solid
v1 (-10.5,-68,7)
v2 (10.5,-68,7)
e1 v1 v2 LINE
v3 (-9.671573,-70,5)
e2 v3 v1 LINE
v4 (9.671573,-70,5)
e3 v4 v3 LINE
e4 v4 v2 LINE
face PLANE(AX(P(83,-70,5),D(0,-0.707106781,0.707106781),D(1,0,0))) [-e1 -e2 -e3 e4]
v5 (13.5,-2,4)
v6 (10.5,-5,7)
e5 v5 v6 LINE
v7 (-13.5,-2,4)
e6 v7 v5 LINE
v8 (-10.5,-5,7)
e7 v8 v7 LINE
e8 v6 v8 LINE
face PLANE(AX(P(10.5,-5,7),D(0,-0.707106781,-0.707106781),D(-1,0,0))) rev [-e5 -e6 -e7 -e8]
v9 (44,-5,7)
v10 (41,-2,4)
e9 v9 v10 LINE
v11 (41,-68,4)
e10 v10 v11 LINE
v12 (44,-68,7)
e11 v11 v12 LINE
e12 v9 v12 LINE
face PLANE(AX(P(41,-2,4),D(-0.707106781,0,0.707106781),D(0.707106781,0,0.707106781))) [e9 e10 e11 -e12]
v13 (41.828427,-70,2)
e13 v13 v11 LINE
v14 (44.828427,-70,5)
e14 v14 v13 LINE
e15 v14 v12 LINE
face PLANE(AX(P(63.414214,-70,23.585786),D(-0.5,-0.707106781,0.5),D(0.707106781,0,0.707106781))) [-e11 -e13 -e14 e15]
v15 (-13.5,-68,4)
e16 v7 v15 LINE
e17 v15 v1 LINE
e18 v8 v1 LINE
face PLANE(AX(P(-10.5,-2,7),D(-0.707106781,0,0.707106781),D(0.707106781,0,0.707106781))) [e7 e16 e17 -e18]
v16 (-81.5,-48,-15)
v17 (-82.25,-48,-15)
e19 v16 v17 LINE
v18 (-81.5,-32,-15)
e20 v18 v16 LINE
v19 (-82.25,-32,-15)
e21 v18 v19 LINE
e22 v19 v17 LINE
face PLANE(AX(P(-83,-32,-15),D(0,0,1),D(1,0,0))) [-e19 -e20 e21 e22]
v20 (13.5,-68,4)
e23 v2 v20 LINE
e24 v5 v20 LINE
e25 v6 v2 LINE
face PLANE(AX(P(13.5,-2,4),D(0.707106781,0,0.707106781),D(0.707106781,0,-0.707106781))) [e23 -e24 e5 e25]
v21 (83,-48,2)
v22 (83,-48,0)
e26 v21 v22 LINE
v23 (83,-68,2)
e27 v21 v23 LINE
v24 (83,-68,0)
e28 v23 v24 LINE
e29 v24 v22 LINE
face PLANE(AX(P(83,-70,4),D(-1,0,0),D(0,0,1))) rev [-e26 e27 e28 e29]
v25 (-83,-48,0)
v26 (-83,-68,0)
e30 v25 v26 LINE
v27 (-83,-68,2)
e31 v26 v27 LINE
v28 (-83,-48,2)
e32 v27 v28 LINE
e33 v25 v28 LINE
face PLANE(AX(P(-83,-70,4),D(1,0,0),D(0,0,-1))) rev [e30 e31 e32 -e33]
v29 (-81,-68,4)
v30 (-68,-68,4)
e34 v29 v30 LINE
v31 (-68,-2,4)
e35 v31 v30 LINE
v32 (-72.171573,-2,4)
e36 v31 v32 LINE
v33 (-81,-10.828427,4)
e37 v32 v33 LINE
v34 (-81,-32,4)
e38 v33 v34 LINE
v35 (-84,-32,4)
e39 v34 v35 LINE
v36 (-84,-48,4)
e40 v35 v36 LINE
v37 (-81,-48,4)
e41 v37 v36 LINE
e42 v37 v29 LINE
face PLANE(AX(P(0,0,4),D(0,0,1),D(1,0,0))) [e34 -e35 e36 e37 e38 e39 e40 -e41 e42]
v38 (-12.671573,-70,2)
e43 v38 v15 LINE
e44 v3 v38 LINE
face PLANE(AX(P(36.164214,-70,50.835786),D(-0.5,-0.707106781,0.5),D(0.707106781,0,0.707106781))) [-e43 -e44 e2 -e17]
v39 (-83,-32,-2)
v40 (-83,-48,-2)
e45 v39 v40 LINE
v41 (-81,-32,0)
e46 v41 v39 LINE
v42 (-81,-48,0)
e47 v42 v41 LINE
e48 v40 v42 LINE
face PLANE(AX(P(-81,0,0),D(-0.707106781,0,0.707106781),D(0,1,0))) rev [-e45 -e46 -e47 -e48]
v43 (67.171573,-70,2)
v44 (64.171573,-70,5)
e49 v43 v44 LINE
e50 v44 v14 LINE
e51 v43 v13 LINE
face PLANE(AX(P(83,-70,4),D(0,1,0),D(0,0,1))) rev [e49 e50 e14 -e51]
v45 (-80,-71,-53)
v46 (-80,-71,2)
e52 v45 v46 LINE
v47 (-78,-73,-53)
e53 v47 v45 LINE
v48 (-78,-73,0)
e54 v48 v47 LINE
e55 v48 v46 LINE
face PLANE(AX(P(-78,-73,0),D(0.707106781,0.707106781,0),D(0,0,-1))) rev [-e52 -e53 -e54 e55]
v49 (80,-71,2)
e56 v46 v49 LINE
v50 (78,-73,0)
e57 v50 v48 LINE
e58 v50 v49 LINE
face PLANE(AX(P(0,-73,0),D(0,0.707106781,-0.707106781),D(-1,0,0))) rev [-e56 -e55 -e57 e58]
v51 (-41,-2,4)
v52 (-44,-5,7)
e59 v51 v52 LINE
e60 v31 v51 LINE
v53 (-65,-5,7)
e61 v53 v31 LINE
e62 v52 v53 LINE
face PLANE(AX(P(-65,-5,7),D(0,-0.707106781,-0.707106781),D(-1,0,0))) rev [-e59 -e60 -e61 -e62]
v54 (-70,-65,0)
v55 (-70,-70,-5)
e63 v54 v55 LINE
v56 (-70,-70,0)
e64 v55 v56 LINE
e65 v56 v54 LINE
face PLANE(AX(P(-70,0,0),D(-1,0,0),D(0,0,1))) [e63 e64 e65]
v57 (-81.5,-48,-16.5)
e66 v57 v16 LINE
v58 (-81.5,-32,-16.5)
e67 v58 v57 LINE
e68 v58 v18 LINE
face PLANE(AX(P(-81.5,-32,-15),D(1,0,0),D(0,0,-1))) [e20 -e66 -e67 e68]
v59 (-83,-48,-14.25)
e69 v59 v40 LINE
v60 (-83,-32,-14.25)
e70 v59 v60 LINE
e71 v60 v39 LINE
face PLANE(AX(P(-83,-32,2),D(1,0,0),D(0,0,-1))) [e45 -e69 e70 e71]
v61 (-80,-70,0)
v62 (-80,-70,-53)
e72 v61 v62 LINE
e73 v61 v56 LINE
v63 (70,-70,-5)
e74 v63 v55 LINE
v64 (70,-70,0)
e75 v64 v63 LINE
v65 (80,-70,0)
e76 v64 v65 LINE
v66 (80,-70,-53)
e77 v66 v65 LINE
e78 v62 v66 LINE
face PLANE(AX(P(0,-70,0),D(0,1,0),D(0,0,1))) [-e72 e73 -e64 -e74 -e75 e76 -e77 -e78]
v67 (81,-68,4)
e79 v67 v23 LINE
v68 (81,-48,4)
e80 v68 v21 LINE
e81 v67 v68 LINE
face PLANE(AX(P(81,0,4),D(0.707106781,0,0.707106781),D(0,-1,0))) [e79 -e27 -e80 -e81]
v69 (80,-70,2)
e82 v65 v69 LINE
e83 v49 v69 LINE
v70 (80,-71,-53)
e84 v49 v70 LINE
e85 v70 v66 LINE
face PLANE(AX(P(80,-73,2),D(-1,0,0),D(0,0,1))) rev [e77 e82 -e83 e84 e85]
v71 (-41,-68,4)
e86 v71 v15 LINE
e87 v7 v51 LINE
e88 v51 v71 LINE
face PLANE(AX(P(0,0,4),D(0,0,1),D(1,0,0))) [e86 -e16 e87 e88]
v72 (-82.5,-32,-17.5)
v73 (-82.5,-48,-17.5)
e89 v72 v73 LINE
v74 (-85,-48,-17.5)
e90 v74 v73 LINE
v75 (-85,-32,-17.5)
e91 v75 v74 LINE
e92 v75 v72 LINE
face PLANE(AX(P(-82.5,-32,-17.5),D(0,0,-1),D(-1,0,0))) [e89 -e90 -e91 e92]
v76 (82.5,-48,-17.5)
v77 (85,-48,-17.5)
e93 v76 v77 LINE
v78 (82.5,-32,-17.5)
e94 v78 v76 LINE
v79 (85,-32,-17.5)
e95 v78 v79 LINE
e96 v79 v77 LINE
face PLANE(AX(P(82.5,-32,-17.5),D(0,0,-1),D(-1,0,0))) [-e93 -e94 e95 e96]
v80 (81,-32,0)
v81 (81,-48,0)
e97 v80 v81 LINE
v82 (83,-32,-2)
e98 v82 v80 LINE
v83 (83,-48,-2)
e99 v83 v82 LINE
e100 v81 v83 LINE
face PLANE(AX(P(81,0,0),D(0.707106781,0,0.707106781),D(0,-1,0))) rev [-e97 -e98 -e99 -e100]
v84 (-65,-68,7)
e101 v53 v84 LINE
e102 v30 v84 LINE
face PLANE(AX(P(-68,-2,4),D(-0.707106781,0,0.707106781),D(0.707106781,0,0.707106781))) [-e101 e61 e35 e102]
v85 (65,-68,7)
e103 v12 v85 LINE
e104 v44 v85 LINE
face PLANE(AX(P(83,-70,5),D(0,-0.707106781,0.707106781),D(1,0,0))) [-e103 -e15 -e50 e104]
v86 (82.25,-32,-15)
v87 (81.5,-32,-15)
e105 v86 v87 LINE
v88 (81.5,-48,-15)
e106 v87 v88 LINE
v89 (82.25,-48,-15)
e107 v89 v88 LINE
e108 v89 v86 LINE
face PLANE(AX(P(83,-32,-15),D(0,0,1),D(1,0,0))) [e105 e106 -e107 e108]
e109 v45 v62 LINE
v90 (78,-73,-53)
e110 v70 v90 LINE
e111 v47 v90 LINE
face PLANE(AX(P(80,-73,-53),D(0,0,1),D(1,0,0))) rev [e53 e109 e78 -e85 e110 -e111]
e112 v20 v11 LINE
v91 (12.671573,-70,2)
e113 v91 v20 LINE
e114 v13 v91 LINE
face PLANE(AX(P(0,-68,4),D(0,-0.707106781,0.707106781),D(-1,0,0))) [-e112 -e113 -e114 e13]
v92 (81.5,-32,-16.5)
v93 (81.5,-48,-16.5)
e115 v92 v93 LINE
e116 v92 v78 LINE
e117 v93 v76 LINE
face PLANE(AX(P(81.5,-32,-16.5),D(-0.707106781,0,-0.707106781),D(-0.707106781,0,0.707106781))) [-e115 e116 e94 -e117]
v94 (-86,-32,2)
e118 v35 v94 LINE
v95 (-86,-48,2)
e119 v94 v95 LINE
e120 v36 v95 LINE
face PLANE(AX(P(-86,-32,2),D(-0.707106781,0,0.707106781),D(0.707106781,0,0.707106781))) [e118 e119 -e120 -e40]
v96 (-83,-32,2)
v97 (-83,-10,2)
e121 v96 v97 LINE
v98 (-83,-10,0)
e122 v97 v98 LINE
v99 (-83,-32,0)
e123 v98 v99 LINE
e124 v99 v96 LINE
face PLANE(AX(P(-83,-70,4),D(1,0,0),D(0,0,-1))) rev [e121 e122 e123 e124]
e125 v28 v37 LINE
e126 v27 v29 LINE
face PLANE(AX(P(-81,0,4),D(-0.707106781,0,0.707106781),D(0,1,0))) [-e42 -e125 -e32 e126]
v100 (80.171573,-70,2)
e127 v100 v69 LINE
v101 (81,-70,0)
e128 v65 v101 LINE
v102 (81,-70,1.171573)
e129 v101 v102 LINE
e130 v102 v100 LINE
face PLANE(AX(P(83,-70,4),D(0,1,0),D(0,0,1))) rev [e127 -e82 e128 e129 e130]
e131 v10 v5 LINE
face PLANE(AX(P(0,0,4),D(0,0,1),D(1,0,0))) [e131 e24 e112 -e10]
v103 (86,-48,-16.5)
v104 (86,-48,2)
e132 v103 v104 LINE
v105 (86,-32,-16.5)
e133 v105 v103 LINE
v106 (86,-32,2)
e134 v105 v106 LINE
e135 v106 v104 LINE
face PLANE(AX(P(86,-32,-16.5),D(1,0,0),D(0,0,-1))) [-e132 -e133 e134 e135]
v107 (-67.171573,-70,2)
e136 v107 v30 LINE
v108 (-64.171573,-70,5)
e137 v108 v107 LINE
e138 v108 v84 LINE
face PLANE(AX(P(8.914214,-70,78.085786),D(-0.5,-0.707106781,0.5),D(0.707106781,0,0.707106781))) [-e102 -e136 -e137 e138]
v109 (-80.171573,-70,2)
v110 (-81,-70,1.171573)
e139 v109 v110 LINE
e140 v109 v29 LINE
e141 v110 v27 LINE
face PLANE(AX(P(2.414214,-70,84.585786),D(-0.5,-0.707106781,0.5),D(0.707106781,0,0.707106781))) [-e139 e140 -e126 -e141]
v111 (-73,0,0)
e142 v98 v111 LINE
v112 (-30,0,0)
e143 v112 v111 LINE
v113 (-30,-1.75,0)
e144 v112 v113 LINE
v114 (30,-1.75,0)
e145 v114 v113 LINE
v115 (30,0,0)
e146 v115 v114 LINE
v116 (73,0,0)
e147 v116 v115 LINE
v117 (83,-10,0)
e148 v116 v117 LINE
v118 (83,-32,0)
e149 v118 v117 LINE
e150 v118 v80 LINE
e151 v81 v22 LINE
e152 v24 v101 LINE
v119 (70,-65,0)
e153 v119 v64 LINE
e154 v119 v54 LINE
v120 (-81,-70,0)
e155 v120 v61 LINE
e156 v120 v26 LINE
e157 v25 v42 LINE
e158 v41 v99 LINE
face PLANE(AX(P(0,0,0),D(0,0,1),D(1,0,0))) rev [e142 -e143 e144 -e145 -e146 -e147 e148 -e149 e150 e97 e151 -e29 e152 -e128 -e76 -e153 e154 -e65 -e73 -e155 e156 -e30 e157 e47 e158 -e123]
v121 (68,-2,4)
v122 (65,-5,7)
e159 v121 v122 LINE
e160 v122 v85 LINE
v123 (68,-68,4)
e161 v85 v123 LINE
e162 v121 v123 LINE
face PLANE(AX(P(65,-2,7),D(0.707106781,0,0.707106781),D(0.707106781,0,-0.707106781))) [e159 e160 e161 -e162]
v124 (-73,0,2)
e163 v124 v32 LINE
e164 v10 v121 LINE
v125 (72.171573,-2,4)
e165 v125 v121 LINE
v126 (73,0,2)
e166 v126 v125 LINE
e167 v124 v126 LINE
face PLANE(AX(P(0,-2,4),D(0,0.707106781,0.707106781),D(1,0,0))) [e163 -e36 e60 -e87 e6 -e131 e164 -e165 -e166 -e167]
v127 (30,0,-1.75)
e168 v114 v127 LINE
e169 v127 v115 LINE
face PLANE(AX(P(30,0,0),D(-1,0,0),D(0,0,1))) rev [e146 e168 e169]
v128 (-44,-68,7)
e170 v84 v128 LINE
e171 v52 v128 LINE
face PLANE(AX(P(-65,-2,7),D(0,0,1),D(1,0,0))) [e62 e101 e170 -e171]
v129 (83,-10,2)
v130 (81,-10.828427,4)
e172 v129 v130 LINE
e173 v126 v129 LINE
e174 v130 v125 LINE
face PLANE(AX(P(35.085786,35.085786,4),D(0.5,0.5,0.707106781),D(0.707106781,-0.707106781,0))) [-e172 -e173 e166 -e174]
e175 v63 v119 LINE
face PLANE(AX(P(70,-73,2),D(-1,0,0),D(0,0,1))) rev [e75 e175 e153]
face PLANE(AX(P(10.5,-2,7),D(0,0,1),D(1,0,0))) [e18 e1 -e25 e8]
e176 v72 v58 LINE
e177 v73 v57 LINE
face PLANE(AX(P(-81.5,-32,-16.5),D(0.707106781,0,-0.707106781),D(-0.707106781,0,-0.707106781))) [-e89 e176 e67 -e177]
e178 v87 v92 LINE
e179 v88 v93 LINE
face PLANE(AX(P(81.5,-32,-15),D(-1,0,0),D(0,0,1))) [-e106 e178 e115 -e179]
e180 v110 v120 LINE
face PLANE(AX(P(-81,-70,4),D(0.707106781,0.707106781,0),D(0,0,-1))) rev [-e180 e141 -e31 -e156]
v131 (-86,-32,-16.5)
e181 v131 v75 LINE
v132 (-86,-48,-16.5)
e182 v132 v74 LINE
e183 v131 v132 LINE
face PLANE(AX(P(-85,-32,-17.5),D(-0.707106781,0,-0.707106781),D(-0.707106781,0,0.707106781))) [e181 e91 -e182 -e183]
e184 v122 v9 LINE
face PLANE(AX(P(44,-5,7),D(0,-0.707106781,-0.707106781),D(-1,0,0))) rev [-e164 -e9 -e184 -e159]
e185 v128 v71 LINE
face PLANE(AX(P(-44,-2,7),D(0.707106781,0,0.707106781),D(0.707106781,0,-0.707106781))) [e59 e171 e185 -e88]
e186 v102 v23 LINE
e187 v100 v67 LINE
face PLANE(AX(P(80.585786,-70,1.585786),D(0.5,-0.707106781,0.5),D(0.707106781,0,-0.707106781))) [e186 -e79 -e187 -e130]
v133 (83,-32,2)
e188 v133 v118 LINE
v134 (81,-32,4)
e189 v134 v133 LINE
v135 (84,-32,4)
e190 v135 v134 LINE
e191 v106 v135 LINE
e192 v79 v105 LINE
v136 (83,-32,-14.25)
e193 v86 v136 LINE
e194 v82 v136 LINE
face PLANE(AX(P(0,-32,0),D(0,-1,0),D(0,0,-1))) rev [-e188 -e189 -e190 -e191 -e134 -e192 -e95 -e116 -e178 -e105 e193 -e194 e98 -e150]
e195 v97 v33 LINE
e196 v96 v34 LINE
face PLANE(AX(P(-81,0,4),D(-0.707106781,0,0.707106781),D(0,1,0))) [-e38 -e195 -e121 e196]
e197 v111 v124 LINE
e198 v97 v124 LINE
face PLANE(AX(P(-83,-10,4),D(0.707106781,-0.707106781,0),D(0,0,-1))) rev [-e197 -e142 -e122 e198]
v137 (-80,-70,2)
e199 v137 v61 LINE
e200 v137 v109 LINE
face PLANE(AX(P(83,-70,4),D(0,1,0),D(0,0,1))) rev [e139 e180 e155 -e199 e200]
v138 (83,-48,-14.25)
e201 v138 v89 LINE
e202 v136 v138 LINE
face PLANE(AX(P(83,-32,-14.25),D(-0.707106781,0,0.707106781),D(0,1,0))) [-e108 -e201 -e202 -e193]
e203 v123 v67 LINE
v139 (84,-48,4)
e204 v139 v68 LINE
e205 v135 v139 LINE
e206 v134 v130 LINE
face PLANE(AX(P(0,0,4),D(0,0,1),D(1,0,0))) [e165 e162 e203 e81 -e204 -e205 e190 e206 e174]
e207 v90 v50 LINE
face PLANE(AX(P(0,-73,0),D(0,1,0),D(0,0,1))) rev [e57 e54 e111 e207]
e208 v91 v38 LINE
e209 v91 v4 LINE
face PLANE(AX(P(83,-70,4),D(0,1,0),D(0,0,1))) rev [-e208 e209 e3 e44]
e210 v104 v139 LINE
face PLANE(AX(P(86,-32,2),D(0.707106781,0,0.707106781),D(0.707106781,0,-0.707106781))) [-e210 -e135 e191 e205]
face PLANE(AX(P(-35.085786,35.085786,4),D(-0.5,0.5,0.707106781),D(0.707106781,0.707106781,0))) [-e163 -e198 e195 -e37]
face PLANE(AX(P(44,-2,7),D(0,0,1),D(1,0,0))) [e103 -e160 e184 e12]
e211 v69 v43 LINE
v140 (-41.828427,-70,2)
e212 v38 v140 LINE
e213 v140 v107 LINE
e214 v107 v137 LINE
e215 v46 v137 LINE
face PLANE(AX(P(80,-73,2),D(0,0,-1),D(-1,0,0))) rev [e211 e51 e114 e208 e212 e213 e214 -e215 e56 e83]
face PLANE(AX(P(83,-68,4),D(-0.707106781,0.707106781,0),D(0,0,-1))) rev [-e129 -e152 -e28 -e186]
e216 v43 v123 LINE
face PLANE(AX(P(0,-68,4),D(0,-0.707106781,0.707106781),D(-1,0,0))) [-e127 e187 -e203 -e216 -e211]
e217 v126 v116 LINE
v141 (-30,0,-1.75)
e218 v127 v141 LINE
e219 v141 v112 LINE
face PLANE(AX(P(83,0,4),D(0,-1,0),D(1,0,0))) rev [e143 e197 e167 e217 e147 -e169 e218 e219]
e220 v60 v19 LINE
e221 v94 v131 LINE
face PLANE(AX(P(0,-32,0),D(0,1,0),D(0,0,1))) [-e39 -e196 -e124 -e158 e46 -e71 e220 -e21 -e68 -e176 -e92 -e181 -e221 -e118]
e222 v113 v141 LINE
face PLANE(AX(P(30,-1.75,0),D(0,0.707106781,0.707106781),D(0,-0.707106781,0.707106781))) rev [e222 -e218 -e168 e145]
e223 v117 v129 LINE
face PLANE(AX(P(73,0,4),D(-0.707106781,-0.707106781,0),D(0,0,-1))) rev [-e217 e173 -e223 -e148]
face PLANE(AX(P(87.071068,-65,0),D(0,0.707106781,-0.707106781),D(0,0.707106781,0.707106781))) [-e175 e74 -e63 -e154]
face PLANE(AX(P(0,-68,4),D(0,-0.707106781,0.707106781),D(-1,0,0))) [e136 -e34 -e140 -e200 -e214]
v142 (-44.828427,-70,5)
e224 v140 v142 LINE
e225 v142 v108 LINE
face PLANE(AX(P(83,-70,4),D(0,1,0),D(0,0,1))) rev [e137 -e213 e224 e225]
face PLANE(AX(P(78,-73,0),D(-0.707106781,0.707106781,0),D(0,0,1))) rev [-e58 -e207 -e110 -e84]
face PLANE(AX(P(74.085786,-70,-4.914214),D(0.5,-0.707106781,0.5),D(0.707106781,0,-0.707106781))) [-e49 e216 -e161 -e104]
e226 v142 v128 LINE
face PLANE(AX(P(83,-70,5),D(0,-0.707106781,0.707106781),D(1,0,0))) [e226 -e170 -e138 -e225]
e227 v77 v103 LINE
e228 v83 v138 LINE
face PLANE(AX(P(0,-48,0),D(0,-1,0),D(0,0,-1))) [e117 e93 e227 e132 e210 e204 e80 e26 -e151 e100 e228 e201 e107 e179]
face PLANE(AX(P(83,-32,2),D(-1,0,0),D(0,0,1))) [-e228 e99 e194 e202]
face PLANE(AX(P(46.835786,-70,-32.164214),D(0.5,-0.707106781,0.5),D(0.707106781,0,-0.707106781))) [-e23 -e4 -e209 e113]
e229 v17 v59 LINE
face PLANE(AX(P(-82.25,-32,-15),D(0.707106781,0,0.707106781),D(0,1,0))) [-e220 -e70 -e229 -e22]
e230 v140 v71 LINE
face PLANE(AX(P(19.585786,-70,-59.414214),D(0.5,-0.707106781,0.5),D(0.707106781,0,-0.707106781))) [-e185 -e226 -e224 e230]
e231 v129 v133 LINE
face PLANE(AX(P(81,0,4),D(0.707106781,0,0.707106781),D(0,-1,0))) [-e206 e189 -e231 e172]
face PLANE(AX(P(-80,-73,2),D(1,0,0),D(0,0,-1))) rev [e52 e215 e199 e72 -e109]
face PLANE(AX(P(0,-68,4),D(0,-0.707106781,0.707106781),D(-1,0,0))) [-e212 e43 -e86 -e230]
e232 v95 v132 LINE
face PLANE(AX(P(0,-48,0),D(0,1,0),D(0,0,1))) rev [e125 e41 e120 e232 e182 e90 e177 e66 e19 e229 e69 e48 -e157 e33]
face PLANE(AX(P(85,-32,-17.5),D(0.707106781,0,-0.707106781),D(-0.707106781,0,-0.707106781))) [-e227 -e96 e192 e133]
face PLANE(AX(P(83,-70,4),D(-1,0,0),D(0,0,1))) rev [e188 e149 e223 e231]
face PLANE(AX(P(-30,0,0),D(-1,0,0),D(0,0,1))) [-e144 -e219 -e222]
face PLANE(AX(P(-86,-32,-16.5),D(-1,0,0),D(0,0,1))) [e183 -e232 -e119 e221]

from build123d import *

# Parameters (mm, degrees)
SKETCH1_W           = 166
SKETCH1_H           = 70
BOSS_EXTRUDE1_DEPTH = 4
CHAMFER1_SIZE       = 10
CHAMFER2_SIZE       = 2
BOSS_EXTRUDE2_DEPTH = 68
CHAMFER3_SIZE       = 3
SKETCH3_W           = 160
SKETCH3_H           = 55
BOSS_EXTRUDE3_DEPTH = 3
CHAMFER4_SIZE       = 2
BOSS_EXTRUDE4_DEPTH = 140
BOSS_EXTRUDE5_DEPTH = 16
CHAMFER5_SIZE       = 0.75
CHAMFER6_SIZE       = 2
CHAMFER7_SIZE       = 2
BOSS_EXTRUDE6_DEPTH = 30


with BuildPart() as part:
    # Sketch1 → Boss-Extrude1 (new body)
    with BuildSketch(Plane.XY):
        with Locations((0, -35)):
            Rectangle(SKETCH1_W, SKETCH1_H)
    extrude(amount=BOSS_EXTRUDE1_DEPTH)

    # Chamfer1
    chamfer1_edges = [part.edges().sort_by_distance(p)[0] for p in [
        (-83, 0, 2),
        (83, 0, 2),
    ]]
    chamfer(chamfer1_edges, length=CHAMFER1_SIZE)

    # Chamfer2
    chamfer2_edges = [part.edges().sort_by_distance(p)[0] for p in [
        (-83, -40, 4),
        (0, 0, 4),
        (78, -5, 4),
        (-78, -5, 4),
        (83, -40, 4),
    ]]
    chamfer(chamfer2_edges, length=CHAMFER2_SIZE)

    # Sketch2 → Boss-Extrude2 (add)
    with BuildSketch(Plane(origin=(0, -70, 0), x_dir=(-1, 0, 0), z_dir=(0, -1, 0))):
        Polygon((68, -4), (65, -7), (44, -7), (41, -4), align=None)
        Polygon((13.5, -4), (-13.5, -4), (-10.5, -7), (10.5, -7), align=None)
        Polygon((-41, -4), (-44, -7), (-65, -7), (-68, -4), align=None)
    extrude(amount=-BOSS_EXTRUDE2_DEPTH)

    # Chamfer3
    chamfer3_edges = [part.edges().sort_by_distance(p)[0] for p in [
        (54.5, -2, 7),
        (0, -2, 7),
        (-54.5, -2, 7),
    ]]
    chamfer(chamfer3_edges, length=CHAMFER3_SIZE - 0.0001)  # a hair under: the kernel refuses the full size

    # Sketch3 → Boss-Extrude3 (add)
    with BuildSketch(Plane(origin=(0, -70, 0), x_dir=(-1, 0, 0), z_dir=(0, -1, 0))):
        with Locations((0, 25.5)):
            Rectangle(SKETCH3_W, SKETCH3_H)
    extrude(amount=BOSS_EXTRUDE3_DEPTH)

    # Chamfer4
    chamfer4_edges = [part.edges().sort_by_distance(p)[0] for p in [
        (80, -73, -25.5),
        (0, -73, 2),
        (-80, -73, -25.5),
    ]]
    chamfer(chamfer4_edges, length=CHAMFER4_SIZE)

    # Sketch4 → Boss-Extrude4 (add)
    with BuildSketch(Plane.ZY.offset(70)):
        Polygon((0, -70), (0, -65), (-5, -70), align=None)
    extrude(amount=-BOSS_EXTRUDE4_DEPTH)

    # Sketch5 → Boss-Extrude5 (add)
    with BuildSketch(Plane(origin=(0, -48, 0), x_dir=(-1, 0, 0), z_dir=(0, -1, 0))):
        Polygon((-81, -4), (-83, -2), (-83, 15), (-81.5, 15), (-81.5, 16.5), (-82.5, 17.5), (-85, 17.5), (-86, 16.5), (-86, -2), (-84, -4), align=None)
        Polygon((81.5, 16.5), (82.5, 17.5), (85, 17.5), (86, 16.5), (86, -2), (84, -4), (81, -4), (83, -2), (83, 15), (81.5, 15), align=None)
    extrude(amount=-BOSS_EXTRUDE5_DEPTH)

    # Chamfer5
    chamfer5_edges = [part.edges().sort_by_distance(p)[0] for p in [
        (83, -40, -15),
        (-83, -40, -15),
    ]]
    chamfer(chamfer5_edges, length=CHAMFER5_SIZE)

    # Chamfer6
    chamfer6_edges = [part.edges().sort_by_distance(p)[0] for p in [
        (83, -40, 0),
        (-83, -40, 0),
    ]]
    chamfer(chamfer6_edges, length=CHAMFER6_SIZE)

    # Chamfer7
    chamfer7_edges = [part.edges().sort_by_distance(p)[0] for p in [
        (-74.5, -70, 4),
        (83, -70, 1),
        (-83, -70, 1),
        (-82, -70, 3),
        (82, -70, 3),
        (-27.25, -70, 4),
        (-42.5, -70, 5.5),
        (-54.5, -70, 7),
        (-66.5, -70, 5.5),
        (27.25, -70, 4),
        (-12, -70, 5.5),
        (12, -70, 5.5),
        (0, -70, 7),
        (74.5, -70, 4),
        (66.5, -70, 5.5),
        (54.5, -70, 7),
        (42.5, -70, 5.5),
    ]]
    chamfer(chamfer7_edges, length=CHAMFER7_SIZE - 0.0001)  # a hair under: the kernel refuses the full size

    # Sketch6 → Boss-Extrude6 (add, symmetric)
    with BuildSketch(Plane(origin=(0, 0, 0), x_dir=(0, 0, -1), z_dir=(1, 0, 0))):
        Polygon((0, -1.75), (1.75, 0), (0, 0), align=None)
    extrude(amount=BOSS_EXTRUDE6_DEPTH, both=True)


solid = part.part
